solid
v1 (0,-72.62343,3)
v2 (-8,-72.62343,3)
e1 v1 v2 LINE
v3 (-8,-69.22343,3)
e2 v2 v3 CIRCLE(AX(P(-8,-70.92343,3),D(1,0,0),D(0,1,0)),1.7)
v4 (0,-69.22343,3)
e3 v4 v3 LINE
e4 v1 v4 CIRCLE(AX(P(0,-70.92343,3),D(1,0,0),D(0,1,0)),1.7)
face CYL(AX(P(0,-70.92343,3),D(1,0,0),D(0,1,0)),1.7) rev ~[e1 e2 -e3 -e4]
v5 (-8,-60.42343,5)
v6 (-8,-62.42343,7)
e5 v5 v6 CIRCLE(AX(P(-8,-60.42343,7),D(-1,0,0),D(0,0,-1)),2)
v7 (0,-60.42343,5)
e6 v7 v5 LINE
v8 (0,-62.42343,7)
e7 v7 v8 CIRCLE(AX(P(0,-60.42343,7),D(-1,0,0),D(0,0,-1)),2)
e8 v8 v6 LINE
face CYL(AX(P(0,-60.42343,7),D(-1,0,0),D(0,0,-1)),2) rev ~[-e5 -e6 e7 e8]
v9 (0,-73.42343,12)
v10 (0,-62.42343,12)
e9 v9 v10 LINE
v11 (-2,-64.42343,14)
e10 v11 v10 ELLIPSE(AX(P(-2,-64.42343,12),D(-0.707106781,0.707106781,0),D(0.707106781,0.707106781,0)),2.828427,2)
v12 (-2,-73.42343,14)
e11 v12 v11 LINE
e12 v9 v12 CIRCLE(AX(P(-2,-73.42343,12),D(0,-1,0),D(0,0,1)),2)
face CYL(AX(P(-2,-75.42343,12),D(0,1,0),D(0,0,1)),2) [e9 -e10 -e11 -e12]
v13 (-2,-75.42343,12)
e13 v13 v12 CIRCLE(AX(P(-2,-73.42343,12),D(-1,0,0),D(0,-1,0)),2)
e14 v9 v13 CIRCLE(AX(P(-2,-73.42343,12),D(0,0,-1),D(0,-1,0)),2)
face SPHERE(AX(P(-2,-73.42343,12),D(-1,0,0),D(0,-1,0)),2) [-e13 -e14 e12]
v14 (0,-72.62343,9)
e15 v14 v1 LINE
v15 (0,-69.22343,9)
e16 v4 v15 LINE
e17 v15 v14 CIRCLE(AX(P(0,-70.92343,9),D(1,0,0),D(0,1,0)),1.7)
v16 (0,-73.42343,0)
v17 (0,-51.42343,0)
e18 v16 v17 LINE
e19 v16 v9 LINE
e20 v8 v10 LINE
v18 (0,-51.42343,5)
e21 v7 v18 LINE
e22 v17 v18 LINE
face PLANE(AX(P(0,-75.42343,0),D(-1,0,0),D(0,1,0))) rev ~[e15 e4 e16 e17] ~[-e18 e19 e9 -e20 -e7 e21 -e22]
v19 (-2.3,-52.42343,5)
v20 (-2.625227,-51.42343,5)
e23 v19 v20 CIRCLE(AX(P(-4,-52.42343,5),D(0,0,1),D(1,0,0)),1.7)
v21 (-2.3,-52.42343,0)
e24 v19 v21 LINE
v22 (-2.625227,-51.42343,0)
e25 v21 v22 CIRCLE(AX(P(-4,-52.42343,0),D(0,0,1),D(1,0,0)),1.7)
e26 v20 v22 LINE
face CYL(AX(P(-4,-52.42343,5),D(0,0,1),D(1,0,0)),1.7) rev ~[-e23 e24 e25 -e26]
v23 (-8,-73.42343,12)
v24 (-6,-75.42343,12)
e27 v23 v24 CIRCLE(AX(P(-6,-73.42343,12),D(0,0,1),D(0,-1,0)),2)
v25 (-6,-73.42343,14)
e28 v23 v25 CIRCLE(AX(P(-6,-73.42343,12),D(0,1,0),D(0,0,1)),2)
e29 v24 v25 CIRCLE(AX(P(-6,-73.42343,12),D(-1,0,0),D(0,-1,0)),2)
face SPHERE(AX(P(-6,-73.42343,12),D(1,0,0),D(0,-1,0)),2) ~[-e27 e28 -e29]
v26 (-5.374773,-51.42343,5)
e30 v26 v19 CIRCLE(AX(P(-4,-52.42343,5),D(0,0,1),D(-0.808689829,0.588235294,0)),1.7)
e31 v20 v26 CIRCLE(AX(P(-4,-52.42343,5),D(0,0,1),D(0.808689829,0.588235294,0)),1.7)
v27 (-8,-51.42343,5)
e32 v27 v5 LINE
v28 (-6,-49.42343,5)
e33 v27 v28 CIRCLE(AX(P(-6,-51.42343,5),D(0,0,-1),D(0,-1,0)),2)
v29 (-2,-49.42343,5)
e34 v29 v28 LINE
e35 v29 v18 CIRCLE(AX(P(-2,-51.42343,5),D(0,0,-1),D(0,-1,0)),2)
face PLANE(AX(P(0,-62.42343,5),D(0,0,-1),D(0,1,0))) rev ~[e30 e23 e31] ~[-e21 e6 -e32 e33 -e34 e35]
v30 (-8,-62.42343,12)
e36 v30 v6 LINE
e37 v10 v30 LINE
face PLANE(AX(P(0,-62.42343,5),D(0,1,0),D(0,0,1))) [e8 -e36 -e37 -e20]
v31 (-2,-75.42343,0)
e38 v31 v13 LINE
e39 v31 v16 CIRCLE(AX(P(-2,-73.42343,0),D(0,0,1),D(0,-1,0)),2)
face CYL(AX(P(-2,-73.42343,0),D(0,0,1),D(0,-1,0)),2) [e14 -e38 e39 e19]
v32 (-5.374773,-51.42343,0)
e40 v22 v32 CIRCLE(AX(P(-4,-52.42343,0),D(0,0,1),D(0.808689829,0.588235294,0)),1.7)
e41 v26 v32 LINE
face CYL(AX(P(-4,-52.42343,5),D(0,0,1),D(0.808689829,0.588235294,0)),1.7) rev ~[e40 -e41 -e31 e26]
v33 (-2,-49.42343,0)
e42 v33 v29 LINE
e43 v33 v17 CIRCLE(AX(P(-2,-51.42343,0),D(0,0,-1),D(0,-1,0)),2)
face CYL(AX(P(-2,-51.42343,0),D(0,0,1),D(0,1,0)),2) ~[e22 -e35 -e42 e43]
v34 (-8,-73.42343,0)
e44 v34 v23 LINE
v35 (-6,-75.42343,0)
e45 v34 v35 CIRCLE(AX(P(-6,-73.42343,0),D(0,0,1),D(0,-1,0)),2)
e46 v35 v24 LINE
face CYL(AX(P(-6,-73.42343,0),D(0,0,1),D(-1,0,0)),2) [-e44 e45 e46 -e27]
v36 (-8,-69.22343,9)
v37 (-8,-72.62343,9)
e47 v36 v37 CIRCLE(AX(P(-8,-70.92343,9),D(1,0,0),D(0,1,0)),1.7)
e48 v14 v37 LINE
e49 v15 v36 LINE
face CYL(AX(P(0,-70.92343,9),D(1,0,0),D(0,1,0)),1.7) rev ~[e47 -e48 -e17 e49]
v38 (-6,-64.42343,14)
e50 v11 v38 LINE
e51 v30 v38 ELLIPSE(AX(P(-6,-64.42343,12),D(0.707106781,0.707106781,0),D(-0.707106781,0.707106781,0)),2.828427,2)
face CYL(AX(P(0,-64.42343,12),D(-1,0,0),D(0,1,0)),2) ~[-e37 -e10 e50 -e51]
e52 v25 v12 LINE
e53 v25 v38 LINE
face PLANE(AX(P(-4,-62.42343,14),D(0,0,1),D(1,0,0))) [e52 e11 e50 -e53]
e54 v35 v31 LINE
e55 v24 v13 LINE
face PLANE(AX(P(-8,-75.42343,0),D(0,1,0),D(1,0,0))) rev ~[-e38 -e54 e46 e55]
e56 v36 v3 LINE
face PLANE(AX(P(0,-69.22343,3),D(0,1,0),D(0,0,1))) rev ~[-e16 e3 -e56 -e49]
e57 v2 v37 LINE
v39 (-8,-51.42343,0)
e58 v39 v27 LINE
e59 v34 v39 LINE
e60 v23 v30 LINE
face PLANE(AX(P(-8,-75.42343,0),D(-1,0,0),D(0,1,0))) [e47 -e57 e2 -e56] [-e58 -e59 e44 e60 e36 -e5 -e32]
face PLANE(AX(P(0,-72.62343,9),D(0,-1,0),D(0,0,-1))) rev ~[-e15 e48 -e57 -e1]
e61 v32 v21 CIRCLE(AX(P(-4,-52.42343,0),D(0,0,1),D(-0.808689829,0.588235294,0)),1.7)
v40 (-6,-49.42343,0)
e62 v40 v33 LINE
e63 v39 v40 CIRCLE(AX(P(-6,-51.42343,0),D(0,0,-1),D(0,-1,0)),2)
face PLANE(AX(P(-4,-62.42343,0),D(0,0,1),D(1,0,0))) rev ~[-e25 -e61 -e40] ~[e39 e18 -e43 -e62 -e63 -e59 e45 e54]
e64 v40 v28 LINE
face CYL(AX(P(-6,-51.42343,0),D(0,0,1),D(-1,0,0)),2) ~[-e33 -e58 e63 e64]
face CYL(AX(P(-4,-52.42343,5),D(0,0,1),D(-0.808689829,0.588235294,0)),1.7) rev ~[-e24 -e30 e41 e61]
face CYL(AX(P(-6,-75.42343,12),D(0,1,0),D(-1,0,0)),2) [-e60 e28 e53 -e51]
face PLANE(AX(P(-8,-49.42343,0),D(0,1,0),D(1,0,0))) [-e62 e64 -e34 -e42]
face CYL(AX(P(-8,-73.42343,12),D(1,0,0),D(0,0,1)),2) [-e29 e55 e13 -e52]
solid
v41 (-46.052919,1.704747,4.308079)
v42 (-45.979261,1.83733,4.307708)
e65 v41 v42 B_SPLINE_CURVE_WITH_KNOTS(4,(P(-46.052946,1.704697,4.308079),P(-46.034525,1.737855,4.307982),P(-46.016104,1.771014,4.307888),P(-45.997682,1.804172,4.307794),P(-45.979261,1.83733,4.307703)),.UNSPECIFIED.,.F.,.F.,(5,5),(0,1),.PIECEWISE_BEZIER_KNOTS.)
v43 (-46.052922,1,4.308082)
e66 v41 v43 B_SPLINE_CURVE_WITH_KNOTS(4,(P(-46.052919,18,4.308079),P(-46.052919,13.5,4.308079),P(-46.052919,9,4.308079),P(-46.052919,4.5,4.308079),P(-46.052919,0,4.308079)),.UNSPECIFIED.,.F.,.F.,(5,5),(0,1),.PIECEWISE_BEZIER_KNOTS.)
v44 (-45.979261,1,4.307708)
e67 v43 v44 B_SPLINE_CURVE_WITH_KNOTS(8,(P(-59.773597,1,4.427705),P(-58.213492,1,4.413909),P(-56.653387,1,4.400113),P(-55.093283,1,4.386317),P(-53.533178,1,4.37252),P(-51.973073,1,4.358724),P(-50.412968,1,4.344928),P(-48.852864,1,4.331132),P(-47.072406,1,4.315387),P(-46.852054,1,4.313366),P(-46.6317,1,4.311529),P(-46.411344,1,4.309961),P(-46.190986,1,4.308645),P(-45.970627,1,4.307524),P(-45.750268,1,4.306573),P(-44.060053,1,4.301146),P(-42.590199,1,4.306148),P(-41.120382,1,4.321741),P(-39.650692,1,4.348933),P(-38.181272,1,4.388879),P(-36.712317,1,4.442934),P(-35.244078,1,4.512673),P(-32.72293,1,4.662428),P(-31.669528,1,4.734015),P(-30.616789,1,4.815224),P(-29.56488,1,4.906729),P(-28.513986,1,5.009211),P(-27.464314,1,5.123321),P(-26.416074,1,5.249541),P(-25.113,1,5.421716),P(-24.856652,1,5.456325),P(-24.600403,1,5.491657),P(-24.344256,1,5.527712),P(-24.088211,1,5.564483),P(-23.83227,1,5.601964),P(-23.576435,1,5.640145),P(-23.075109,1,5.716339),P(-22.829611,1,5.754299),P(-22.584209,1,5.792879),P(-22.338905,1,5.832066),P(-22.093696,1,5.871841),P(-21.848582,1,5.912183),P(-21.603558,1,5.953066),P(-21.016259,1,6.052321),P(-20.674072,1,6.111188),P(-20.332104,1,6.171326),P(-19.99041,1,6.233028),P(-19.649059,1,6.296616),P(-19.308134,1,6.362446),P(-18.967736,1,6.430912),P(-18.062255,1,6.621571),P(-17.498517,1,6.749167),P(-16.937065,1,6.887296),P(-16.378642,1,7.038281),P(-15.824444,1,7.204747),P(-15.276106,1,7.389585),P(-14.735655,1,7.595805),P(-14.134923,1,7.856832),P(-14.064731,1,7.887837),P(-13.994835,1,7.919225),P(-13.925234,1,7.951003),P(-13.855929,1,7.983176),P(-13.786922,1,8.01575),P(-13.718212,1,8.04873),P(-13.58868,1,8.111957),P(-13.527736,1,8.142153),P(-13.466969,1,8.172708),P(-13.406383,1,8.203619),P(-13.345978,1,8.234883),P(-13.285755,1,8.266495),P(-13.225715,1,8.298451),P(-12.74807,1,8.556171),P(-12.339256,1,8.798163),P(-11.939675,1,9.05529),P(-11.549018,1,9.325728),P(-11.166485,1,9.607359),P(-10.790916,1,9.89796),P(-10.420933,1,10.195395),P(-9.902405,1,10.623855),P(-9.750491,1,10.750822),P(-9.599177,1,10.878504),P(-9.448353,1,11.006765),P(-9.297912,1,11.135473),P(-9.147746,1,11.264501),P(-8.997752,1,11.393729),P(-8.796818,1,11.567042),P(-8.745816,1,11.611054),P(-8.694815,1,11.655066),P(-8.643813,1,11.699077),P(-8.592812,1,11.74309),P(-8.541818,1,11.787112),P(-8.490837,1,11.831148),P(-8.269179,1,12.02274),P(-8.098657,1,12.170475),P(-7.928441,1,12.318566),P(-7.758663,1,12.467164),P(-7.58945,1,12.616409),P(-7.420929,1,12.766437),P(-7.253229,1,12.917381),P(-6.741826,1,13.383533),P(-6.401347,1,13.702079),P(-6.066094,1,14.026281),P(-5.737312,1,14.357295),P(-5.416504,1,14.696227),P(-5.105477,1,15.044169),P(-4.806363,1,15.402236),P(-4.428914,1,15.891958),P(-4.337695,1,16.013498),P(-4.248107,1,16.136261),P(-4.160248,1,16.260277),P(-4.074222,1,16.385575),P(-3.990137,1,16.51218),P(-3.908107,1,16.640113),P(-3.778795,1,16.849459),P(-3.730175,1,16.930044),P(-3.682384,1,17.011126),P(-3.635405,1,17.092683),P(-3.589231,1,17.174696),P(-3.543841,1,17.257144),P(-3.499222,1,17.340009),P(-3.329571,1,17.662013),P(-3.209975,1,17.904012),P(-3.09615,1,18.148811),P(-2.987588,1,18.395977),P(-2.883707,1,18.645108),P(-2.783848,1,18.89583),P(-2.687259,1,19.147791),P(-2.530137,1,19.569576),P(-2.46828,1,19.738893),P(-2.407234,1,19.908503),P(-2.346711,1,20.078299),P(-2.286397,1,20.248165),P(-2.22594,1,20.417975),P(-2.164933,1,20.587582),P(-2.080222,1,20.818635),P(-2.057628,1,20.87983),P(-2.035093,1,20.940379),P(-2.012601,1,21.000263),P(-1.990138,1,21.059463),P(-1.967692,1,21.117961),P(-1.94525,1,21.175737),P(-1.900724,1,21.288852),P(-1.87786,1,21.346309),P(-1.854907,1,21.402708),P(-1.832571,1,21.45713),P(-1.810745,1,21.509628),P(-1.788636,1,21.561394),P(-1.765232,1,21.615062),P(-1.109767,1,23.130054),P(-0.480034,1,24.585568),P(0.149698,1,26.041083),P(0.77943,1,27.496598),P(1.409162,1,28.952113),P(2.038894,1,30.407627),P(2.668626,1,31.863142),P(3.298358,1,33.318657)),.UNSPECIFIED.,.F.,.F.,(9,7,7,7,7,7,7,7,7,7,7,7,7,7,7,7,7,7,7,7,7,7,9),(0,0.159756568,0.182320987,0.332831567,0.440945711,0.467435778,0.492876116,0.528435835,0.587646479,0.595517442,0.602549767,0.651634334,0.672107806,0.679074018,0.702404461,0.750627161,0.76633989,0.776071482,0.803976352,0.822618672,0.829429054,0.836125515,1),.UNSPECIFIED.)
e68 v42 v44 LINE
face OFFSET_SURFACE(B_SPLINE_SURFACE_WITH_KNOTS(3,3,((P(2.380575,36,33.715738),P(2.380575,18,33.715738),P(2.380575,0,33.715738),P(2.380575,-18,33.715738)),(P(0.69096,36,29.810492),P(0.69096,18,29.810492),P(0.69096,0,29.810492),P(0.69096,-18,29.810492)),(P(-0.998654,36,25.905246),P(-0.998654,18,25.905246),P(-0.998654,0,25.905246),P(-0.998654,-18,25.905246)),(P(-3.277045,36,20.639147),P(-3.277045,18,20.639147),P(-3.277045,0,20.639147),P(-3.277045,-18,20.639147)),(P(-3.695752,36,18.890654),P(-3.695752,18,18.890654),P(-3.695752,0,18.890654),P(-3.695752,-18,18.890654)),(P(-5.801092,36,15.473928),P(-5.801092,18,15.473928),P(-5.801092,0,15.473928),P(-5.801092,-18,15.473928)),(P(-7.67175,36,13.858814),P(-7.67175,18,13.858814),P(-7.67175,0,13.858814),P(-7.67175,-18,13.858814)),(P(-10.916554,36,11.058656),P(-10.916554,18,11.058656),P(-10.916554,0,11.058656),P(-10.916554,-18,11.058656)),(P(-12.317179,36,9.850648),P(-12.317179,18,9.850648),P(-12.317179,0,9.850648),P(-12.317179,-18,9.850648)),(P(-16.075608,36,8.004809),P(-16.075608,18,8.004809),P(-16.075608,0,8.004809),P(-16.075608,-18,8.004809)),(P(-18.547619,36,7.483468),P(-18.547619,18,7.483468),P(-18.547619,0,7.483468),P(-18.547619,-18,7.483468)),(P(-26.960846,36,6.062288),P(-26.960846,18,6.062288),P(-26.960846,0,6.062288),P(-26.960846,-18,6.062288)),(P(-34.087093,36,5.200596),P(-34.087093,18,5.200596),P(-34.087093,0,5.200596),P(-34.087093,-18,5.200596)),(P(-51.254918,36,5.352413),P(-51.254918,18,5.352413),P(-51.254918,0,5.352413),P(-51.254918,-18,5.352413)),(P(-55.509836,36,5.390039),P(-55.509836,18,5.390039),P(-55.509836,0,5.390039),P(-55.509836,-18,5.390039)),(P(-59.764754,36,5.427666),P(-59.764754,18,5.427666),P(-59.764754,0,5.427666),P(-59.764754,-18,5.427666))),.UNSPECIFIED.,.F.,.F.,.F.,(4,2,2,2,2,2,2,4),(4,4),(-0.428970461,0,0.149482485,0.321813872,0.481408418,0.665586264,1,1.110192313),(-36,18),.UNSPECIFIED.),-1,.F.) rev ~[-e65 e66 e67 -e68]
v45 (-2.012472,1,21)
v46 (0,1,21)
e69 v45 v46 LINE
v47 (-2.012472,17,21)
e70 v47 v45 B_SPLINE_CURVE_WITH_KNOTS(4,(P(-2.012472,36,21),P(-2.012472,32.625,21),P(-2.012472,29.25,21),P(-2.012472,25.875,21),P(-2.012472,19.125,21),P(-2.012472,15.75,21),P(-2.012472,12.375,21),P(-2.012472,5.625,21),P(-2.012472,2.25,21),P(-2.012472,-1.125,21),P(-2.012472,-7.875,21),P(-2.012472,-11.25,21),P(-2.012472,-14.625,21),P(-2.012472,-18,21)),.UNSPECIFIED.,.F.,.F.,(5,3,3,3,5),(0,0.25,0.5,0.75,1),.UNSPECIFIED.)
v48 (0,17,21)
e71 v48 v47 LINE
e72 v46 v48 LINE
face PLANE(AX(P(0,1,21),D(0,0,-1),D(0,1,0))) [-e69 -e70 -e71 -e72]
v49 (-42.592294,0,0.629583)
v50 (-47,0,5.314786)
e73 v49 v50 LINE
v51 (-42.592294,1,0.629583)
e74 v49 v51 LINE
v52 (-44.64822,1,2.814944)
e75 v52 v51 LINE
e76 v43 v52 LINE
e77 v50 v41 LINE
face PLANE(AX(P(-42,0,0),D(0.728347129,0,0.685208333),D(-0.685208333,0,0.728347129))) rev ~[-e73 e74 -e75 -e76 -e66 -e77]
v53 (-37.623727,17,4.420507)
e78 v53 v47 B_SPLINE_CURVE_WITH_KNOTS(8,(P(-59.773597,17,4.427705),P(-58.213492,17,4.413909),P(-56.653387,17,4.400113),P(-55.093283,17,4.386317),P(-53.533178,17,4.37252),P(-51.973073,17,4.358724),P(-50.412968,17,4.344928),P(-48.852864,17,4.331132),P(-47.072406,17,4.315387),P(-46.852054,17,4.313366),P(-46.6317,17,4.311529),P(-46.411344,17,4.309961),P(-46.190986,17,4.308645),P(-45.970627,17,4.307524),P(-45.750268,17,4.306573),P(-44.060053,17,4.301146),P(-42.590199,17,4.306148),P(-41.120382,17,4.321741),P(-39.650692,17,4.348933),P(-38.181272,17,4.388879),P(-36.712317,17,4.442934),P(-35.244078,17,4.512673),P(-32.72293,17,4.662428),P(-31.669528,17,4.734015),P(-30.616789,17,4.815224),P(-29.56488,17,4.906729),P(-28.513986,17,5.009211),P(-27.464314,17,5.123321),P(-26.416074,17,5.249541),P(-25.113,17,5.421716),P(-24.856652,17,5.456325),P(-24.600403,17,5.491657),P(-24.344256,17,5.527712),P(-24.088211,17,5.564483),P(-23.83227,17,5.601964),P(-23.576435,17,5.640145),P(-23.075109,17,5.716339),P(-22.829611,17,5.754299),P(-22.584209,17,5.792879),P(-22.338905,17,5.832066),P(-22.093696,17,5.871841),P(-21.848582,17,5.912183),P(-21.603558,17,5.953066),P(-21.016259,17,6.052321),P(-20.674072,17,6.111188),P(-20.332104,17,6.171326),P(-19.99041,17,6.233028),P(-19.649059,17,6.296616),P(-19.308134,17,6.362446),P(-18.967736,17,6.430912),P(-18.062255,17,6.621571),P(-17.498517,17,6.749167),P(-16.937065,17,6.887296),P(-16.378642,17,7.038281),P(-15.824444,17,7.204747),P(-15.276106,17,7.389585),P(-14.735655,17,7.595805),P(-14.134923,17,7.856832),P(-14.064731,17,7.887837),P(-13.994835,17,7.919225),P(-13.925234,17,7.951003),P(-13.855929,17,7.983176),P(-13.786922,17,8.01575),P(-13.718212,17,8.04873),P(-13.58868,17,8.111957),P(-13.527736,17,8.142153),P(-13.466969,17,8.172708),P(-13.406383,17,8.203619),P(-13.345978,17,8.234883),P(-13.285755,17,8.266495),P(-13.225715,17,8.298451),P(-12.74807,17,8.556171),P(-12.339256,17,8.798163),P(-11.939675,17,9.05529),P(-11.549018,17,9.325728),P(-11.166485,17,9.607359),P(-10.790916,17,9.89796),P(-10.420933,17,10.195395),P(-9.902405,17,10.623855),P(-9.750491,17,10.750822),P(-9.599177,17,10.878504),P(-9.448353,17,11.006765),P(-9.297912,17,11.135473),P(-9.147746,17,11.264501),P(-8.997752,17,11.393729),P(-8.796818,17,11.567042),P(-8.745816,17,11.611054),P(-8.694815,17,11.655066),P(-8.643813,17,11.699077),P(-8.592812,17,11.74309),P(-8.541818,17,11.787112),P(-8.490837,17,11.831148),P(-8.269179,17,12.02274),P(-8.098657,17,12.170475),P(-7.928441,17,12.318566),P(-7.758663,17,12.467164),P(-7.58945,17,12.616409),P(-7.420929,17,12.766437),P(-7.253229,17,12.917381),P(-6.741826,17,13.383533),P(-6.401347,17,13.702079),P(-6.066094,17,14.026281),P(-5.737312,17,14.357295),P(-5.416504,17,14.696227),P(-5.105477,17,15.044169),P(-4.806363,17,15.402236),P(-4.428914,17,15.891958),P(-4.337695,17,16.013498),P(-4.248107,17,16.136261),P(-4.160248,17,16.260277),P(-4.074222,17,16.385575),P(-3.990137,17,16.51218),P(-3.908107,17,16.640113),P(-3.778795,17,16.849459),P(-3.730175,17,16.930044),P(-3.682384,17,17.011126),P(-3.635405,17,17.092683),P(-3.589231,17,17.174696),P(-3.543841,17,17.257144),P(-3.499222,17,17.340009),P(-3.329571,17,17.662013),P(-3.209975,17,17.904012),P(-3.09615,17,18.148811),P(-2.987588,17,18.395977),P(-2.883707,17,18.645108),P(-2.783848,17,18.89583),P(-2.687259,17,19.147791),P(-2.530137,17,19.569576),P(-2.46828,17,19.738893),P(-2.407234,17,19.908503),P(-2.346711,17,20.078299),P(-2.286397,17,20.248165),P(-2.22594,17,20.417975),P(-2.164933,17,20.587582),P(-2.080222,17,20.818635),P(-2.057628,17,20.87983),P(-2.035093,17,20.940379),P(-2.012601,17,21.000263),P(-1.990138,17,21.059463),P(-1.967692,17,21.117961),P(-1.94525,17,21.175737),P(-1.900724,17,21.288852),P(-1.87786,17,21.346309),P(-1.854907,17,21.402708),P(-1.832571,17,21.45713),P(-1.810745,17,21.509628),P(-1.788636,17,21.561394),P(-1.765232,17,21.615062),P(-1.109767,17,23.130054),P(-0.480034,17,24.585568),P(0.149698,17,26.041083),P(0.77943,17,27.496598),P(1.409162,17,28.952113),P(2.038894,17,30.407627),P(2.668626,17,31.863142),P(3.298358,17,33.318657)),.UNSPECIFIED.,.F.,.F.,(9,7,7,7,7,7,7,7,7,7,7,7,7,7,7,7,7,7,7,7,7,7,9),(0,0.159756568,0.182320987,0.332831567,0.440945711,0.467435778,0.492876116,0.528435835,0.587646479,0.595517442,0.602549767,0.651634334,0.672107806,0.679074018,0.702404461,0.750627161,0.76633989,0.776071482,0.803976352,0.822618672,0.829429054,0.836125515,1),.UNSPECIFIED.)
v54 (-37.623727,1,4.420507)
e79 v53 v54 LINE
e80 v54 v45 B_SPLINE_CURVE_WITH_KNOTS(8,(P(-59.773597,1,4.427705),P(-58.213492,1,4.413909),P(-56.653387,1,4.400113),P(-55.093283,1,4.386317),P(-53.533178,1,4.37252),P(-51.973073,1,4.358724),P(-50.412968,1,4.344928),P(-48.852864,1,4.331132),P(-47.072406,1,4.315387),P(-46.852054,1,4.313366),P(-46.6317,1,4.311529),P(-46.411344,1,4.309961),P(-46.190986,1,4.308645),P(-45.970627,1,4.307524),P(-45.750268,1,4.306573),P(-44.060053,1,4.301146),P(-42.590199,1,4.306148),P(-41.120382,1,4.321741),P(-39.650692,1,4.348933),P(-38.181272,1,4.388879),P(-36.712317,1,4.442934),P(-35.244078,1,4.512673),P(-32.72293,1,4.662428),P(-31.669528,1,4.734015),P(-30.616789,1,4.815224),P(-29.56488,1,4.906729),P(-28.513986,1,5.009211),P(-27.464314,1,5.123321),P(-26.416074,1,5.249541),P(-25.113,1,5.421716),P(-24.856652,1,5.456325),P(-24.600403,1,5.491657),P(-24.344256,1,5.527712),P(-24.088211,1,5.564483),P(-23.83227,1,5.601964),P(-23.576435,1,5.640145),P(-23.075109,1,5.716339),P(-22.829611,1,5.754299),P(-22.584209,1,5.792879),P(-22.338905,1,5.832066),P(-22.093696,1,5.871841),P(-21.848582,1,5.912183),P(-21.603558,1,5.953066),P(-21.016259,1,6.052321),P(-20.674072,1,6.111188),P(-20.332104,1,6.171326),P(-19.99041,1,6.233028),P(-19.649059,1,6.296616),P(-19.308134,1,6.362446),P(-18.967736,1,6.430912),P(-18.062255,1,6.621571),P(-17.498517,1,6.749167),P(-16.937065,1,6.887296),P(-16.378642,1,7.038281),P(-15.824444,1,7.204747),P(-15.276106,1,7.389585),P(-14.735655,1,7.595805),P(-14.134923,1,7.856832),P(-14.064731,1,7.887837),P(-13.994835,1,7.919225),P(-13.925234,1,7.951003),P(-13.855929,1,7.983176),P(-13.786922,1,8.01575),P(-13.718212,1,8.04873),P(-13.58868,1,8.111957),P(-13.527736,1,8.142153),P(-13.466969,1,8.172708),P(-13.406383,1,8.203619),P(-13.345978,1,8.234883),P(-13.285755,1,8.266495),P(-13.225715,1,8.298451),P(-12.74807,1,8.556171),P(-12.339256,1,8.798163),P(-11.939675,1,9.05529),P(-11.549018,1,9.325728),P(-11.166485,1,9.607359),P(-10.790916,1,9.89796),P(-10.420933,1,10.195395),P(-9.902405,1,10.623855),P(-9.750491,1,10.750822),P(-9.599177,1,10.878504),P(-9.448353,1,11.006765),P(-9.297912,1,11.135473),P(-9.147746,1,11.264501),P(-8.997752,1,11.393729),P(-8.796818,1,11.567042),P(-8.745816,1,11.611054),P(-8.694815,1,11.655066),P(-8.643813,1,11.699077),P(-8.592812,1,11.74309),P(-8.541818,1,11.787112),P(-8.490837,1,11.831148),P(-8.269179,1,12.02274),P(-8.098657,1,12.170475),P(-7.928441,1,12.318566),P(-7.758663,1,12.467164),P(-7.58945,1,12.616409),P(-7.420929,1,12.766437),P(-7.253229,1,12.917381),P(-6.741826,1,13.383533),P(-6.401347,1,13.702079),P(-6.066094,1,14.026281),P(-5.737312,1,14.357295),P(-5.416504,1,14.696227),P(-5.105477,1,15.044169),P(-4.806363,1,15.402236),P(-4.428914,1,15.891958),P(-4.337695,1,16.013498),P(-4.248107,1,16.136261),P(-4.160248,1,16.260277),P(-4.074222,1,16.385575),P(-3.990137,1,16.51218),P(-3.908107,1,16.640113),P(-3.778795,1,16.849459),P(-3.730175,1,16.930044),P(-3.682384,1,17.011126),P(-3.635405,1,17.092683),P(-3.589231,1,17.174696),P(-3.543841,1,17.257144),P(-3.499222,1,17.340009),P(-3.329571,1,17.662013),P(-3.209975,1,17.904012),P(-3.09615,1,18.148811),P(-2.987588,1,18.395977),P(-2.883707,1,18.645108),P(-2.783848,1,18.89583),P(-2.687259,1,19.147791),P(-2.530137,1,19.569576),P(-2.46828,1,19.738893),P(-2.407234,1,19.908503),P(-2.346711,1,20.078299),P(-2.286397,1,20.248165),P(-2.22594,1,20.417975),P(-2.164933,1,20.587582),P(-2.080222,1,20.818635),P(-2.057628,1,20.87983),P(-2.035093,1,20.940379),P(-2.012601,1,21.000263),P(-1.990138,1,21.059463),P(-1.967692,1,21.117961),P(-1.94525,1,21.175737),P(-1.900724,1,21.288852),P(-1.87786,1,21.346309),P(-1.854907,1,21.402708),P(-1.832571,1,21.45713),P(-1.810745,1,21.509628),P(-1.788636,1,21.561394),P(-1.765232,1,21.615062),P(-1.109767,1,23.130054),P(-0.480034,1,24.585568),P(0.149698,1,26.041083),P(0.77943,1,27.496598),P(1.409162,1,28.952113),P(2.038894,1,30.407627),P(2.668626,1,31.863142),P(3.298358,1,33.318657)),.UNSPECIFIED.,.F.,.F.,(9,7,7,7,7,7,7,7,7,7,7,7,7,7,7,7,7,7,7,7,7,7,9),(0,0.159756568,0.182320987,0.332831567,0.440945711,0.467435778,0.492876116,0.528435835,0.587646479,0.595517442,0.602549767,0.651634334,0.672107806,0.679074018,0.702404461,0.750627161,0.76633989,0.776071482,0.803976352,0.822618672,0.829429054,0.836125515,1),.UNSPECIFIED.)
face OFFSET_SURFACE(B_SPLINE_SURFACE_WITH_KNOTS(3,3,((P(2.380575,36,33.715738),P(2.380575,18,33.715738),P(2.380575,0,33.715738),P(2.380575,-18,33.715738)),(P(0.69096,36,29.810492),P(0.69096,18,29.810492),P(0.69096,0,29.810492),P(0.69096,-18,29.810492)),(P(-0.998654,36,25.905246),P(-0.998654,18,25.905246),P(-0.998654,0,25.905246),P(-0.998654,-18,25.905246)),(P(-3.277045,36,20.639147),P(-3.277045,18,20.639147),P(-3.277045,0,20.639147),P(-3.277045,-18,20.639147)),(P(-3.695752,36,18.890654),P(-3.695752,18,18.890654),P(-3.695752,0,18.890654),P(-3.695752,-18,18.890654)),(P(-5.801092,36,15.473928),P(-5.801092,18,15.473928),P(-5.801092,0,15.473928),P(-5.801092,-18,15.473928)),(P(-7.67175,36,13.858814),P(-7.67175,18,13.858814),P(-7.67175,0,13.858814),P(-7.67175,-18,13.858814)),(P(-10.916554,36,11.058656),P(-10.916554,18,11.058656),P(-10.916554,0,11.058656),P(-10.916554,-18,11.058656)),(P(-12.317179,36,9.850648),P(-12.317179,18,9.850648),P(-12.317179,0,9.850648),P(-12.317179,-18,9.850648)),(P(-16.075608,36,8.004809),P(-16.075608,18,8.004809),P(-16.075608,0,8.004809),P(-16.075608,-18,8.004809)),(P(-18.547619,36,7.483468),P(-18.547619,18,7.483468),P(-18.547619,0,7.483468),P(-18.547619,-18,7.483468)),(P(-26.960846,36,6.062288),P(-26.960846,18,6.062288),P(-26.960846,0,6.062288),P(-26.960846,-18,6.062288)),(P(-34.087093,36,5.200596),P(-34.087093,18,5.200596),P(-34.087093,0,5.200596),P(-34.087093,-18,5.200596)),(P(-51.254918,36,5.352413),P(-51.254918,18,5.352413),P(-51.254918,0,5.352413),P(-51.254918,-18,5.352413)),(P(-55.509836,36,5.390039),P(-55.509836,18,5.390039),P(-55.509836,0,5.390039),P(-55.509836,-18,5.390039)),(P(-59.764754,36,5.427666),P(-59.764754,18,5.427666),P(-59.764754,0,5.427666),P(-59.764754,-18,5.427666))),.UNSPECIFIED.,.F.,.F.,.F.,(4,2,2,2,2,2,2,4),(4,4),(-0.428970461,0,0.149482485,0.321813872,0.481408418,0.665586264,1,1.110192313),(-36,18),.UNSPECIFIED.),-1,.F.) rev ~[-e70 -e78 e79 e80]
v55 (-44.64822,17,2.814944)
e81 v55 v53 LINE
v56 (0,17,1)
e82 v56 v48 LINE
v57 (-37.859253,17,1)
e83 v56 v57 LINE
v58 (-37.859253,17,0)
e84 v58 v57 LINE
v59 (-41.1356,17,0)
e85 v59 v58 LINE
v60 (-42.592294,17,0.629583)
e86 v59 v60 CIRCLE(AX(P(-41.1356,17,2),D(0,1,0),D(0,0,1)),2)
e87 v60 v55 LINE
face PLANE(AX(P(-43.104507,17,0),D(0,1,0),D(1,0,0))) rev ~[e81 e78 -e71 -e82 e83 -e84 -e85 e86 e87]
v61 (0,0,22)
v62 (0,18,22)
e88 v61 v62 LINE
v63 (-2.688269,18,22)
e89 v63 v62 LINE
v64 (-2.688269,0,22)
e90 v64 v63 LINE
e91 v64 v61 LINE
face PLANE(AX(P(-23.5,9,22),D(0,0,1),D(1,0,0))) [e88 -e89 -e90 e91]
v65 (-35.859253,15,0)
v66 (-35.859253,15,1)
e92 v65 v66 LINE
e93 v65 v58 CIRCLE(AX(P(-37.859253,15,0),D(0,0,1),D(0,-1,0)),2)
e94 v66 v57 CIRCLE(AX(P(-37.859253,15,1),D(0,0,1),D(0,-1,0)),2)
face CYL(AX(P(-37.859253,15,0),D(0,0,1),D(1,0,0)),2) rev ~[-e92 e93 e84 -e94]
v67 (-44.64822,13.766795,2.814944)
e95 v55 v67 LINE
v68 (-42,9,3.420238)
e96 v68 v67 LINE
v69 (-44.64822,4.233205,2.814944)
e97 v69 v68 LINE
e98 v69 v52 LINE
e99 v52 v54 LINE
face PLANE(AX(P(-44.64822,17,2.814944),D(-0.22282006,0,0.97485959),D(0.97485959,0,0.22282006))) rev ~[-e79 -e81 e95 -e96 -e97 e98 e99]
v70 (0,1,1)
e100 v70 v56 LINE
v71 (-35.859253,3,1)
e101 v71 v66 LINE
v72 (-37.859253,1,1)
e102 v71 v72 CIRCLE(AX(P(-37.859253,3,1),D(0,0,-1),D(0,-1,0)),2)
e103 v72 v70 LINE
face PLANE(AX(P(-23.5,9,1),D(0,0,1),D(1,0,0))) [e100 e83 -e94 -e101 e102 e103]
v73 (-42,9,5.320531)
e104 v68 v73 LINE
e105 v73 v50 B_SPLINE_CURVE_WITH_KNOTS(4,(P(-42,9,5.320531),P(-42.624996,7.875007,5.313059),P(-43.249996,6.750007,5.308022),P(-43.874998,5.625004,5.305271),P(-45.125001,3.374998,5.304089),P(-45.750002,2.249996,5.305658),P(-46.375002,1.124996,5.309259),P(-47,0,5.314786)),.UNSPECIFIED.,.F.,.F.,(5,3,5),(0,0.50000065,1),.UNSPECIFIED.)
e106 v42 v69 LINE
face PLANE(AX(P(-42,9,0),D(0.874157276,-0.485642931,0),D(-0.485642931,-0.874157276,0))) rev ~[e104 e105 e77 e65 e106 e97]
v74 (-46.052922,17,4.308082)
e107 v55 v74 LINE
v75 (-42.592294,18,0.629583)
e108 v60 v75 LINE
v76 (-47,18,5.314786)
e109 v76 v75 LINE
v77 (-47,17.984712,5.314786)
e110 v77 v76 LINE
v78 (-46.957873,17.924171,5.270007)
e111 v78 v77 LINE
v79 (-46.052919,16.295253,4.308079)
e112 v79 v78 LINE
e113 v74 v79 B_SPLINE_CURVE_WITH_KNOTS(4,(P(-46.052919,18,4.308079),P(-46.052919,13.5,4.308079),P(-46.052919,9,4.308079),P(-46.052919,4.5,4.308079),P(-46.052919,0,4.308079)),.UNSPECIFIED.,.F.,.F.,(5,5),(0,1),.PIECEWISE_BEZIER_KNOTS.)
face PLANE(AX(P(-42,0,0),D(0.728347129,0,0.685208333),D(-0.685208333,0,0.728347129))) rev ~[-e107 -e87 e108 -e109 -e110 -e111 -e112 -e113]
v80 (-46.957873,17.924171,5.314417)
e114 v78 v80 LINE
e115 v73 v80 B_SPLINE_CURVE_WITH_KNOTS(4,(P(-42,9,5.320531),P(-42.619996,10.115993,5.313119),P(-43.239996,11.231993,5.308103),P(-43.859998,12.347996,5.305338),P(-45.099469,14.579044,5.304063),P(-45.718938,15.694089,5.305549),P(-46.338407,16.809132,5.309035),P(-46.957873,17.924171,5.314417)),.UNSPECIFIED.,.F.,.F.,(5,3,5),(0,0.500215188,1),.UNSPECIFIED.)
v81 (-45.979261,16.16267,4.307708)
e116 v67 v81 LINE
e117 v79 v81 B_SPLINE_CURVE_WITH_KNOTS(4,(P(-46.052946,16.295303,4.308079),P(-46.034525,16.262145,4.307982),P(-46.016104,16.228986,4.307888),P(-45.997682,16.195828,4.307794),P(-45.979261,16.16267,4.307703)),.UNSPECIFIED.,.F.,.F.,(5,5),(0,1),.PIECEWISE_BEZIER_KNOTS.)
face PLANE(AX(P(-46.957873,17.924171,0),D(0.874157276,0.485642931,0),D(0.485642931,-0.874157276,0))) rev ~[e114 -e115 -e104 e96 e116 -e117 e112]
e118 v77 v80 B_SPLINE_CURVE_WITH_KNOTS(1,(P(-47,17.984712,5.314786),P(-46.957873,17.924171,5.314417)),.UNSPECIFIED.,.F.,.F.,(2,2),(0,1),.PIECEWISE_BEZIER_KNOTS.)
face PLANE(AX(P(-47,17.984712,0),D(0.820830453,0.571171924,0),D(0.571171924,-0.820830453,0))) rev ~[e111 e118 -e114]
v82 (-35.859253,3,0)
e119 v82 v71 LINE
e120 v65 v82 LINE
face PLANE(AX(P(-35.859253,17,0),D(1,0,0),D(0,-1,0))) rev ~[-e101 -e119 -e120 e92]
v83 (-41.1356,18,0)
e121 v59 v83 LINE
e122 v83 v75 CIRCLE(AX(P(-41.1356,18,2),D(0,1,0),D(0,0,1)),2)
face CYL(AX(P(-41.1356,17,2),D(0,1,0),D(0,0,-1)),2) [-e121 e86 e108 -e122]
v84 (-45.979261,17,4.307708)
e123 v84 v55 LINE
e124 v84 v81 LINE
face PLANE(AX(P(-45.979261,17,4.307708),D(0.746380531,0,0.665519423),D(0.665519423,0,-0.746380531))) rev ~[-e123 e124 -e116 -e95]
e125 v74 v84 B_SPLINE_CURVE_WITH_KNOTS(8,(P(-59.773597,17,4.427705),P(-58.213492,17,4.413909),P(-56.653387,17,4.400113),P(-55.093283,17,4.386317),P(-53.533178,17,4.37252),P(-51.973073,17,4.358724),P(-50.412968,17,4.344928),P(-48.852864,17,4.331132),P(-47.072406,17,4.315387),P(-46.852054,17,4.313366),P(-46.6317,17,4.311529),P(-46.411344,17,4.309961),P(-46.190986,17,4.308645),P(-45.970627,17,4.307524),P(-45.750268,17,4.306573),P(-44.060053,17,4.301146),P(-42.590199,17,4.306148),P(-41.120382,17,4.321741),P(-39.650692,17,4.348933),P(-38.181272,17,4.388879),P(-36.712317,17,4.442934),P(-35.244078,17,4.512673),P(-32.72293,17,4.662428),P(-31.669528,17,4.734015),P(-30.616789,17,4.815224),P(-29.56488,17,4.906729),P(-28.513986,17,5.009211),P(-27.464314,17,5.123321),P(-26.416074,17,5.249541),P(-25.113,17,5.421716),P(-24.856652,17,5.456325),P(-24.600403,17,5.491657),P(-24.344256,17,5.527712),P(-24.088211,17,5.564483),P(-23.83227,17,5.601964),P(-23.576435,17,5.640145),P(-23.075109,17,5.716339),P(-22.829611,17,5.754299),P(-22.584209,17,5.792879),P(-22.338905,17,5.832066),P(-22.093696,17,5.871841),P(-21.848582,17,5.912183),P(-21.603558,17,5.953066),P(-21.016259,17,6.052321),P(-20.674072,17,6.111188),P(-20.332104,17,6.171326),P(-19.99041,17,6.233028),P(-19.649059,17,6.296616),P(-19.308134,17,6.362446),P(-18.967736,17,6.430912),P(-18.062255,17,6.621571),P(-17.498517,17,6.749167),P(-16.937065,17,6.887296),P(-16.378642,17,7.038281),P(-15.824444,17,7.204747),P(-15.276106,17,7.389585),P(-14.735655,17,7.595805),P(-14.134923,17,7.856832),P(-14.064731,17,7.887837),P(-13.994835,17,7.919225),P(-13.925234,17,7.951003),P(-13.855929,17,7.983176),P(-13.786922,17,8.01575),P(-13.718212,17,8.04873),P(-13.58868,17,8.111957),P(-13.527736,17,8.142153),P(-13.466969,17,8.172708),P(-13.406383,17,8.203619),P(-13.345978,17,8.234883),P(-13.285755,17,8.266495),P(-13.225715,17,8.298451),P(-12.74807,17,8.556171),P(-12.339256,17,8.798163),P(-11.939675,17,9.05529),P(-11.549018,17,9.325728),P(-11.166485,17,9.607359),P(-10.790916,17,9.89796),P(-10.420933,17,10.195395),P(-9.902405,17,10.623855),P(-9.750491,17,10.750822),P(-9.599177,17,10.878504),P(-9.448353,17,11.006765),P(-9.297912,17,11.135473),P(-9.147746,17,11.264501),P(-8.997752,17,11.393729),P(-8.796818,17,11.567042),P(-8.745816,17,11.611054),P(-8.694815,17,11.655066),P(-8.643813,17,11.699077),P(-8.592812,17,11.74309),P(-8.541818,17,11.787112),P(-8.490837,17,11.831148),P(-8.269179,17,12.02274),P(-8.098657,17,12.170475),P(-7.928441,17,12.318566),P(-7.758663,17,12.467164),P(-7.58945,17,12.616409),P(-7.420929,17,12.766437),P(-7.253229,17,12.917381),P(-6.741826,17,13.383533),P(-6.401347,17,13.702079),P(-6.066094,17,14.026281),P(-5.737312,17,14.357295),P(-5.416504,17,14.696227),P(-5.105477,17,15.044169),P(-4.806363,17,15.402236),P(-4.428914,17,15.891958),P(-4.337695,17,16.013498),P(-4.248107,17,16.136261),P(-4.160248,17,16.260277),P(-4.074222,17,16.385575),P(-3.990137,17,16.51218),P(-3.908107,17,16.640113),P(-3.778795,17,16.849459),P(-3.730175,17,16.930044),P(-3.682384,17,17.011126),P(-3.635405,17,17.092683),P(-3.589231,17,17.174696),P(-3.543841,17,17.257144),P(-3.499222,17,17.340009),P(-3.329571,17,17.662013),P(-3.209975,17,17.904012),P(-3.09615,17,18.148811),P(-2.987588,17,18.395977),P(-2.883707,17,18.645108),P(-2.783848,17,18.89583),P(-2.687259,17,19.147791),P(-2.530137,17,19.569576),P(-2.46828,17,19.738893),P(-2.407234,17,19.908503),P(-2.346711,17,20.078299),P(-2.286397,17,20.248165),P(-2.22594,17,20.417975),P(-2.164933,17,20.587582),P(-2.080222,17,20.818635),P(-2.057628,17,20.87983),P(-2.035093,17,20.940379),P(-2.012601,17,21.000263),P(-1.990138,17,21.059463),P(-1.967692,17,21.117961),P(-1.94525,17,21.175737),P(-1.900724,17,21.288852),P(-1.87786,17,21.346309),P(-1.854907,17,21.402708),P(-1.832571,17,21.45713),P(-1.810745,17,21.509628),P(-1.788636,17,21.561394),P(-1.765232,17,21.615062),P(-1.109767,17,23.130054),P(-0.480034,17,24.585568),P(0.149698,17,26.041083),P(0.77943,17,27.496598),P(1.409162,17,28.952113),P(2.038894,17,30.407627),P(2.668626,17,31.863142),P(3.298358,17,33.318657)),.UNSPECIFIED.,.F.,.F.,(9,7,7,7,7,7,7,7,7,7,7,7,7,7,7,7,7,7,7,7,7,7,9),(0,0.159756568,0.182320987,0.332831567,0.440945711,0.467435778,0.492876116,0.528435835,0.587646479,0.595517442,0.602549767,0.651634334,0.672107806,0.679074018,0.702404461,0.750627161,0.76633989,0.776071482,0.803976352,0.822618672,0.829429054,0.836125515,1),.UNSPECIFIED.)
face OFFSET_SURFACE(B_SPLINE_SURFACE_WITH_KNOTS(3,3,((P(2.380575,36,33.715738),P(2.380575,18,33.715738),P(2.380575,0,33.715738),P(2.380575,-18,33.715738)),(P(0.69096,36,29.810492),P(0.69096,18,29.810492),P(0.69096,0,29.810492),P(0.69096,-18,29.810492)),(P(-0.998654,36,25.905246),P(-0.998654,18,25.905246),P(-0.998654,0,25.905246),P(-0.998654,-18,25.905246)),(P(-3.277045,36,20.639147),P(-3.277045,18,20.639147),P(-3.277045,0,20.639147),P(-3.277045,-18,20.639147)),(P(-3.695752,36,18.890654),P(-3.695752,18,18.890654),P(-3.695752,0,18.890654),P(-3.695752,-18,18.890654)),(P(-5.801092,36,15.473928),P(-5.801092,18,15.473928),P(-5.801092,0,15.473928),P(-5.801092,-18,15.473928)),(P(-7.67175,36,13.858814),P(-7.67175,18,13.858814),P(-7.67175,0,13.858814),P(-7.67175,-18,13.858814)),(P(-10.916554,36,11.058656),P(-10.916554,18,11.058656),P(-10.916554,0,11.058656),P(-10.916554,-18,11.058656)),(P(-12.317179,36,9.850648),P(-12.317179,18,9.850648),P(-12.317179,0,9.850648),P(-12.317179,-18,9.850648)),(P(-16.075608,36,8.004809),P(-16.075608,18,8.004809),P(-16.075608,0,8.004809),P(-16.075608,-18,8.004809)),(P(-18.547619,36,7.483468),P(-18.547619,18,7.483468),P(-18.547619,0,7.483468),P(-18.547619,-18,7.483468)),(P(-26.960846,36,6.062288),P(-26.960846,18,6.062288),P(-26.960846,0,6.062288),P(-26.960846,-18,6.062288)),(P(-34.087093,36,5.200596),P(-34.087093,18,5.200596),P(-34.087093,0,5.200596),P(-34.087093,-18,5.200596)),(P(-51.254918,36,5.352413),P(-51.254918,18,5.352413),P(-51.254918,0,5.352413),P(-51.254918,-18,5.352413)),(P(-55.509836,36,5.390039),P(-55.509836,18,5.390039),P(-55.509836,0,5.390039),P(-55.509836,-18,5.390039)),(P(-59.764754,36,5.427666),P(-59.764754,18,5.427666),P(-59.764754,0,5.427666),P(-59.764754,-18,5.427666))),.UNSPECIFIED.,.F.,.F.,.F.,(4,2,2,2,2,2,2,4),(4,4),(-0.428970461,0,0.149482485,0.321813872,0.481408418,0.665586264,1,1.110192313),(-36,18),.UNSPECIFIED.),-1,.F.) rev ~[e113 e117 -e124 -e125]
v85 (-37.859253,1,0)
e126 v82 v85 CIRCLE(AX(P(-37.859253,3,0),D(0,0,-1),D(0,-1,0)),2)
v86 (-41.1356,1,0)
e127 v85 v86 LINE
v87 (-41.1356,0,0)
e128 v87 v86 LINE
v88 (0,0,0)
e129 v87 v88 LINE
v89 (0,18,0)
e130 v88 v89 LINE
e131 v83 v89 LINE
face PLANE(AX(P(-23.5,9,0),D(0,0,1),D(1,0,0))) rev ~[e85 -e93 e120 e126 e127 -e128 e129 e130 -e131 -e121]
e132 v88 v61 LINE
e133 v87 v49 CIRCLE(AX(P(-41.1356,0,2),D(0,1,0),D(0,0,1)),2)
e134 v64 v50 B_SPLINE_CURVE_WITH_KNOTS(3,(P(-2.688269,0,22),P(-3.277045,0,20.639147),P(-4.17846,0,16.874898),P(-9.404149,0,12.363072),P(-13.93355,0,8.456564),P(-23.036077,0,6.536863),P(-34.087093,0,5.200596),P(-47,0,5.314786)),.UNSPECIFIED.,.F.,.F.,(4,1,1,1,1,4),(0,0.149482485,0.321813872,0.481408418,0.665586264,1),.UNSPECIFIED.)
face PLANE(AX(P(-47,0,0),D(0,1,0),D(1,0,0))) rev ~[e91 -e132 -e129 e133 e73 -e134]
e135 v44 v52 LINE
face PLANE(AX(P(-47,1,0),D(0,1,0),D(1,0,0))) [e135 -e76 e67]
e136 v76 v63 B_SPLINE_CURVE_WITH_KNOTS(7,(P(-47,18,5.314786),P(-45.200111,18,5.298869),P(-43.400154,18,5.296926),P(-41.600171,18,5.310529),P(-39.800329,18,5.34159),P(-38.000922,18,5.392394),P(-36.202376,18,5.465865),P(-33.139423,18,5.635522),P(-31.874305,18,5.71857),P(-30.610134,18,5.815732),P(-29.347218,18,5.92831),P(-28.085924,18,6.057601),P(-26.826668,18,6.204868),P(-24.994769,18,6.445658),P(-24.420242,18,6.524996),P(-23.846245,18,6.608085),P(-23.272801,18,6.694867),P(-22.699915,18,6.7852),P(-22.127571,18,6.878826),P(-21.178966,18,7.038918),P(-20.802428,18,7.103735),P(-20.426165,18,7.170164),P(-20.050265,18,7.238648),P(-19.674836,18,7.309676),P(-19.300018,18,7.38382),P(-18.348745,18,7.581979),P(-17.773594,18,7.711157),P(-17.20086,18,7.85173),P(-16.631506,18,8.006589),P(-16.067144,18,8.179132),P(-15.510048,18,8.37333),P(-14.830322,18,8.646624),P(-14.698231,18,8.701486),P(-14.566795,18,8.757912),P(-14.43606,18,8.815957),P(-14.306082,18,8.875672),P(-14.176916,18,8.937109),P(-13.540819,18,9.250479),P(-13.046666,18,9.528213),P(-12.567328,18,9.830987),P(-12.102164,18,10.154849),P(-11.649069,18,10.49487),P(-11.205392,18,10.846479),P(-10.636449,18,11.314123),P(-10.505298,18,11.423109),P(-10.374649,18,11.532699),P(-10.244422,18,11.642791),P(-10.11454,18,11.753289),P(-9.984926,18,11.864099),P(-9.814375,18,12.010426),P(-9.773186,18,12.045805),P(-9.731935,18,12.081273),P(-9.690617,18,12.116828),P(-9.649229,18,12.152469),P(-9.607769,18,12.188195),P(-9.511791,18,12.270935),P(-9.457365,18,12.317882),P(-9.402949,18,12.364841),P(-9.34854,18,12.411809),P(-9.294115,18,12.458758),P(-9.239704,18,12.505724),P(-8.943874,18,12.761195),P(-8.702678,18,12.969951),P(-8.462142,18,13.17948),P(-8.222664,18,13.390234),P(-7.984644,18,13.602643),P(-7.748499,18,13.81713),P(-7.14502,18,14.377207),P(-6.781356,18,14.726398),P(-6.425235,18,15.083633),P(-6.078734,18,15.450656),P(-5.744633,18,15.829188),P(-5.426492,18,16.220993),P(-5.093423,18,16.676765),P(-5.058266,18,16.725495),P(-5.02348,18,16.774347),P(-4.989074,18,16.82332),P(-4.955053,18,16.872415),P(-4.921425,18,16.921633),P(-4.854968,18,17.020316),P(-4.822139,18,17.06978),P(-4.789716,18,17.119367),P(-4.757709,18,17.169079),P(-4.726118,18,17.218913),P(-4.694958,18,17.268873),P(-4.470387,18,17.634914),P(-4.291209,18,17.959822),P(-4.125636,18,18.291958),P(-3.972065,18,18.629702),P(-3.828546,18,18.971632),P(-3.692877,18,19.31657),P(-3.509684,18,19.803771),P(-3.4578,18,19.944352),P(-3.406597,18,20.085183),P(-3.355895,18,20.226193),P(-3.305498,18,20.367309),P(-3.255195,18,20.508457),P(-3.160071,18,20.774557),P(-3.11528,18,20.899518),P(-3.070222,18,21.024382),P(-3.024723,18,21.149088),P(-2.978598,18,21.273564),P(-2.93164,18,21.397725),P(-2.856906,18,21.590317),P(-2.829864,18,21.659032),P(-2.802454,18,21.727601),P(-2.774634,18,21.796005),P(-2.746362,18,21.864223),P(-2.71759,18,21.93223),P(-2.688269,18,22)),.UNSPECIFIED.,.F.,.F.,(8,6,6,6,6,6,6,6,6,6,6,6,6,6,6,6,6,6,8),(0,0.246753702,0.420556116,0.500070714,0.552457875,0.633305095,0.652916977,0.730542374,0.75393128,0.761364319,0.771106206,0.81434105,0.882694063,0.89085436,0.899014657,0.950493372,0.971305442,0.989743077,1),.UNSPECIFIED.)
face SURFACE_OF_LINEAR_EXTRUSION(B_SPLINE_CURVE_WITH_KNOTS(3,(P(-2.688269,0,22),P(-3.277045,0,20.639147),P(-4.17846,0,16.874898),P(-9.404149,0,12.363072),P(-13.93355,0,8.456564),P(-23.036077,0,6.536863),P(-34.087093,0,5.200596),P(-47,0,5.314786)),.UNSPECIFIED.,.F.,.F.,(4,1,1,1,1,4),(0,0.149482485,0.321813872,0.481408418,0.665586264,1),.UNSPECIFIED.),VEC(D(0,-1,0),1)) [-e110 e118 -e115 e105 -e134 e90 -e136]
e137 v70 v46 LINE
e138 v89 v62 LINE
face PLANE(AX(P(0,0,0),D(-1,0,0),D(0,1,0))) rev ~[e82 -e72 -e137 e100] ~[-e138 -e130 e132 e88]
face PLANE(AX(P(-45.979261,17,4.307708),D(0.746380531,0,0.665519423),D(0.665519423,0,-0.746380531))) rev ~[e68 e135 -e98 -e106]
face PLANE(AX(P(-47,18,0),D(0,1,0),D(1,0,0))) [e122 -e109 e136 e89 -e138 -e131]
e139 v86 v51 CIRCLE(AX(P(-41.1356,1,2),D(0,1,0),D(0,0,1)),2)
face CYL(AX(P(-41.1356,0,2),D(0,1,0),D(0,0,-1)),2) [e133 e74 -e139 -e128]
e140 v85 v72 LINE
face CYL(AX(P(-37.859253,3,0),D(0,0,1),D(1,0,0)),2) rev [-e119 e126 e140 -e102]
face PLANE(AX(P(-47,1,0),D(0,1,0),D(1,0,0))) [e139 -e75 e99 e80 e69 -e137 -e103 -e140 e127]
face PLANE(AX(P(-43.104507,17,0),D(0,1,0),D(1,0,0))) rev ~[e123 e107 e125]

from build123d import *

# Parameters (mm, degrees)
F0_W      = 47
F0_H      = 18
F1_DEPTH  = 22
F4_DEPTH  = 25
F5_DEPTH  = 25
F7_T      = -1
F2_W      = 16
F2_H      = 20
F8_DEPTH  = 1
F9_W      = 8
F9_H      = 26
F10_DEPTH = 14
F11_W     = 13
F11_H     = 9
F12_DEPTH = 25
F13_R     = 2
F15_DEPTH = 25
F17_DEPTH = 25
F19_W     = 6.1407467425
F19_H     = 16
F20_DEPTH = 2
F21_R     = 2
F23_DEPTH = 16
F24_DEPTH = 25


# Not quite as in the source:
# - ends of sketch curves that miss each other by under 0.0002 mm in the source are joined


with BuildPart() as f1:
    # F0 (on Top) → F1 (new body)
    with BuildSketch(Plane.XY):
        with Locations((-23.5, 9)):
            Rectangle(F0_W, F0_H)
    extrude(amount=F1_DEPTH)

    # F3 (on face) → F4 (cut)
    with BuildSketch(Plane.XZ):
        with BuildLine():
            add(Edge.make_bspline(
                [(-2.6882688196, 22), (-3.2770454434, 20.6391466758), (-4.1784598757, 16.8748983141), (-9.4041486141, 12.3630724805), (-13.9335501605, 8.4565637973), (-23.0360767099, 6.5368633633), (-34.0870933489, 5.200595818), (-47, 5.3147859871)],
                knots=[0, 0, 0, 0, 0.1494824851, 0.3218138719, 0.4814084184, 0.6655862643, 1, 1, 1, 1], degree=3))
            Line((-2.6882688196, 22), (-47, 22))
            Line((-47, 22), (-47, 5.3147859871))
        make_face()
    extrude(amount=-F4_DEPTH, mode=Mode.SUBTRACT)

    # F3 (on face) → F5 (cut)
    with BuildSketch(Plane.XZ):
        Polygon((-42, 0), (-47, 5.3147859871), (-47, 0), align=None)
    extrude(amount=-F5_DEPTH, mode=Mode.SUBTRACT)

    # F7
    f7_openings = [f1.faces().sort_by_distance(p)[0] for p in [
        (-44.5, 9, 2.657393),
    ]]
    offset(amount=F7_T, openings=f7_openings, kind=Kind.INTERSECTION)

    # F2 (on face) → F8 (cut)
    with BuildSketch(Plane.YZ):
        with Locations((9, 11)):
            Rectangle(F2_W, F2_H)
    extrude(amount=-F8_DEPTH, mode=Mode.SUBTRACT)

    # F19 (on face) → F20 (cut)
    with BuildSketch(Plane(origin=(0, 0, 0), x_dir=(1, 0, 0), z_dir=(0, 0, -1))):
        with Locations((-38.9296266288, -9)):
            Rectangle(F19_W, F19_H)
        Polygon((-42, -1), (-42.6852083329, -1), (-43.1045070291, -1), (-43.1045070291, -17), (-42.6852083329, -17), (-42, -17), align=None)
    extrude(amount=-F20_DEPTH, mode=Mode.SUBTRACT)

    # F21
    f21_edges = [f1.edges().sort_by_distance(p)[0] for p in [
        (-35.859253, 17, 0.5),
        (-35.859253, 1, 0.5),
        (-42, 0.5, 0),
        (-42, 17.5, 0),
    ]]
    fillet(f21_edges, radius=F21_R)

    # F22 (on face) → F23 (join, through all)
    with BuildSketch(Plane.XZ.offset(-17)):
        with BuildLine():
            add(Edge.make_bspline(
                [(-45.979261035, 4.3077080456), (-45.9230921355, 4.3074304854), (-45.8669231813, 4.3071662313), (-45.8107541815, 4.3069151492), (-45.7545851445, 4.306677229), (-45.6984160781, 4.3064526573), (-45.6422469881, 4.3062418902), (-45.5860778784, 4.3060457258), (-44.541461727, 4.3026916555), (-43.5530151209, 4.3039144034), (-42.564580075, 4.309797802), (-41.5761785653, 4.3206346602), (-40.5878433409, 4.3367473036), (-39.599618044, 4.3584926715), (-38.61155733, 4.3862671393), (-37.6237268056, 4.4205065789)],
                knots=[0.1765693684, 0.1765693684, 0.1765693684, 0.1765693684, 0.1765693684, 0.1765693684, 0.1765693684, 0.1765693684, 0.1765693684, 0.1823209871, 0.1823209871, 0.1823209871, 0.1823209871, 0.1823209871, 0.1823209871, 0.1823209871, 0.2835362009, 0.2835362009, 0.2835362009, 0.2835362009, 0.2835362009, 0.2835362009, 0.2835362009, 0.2835362009, 0.2835362009], degree=8))
            Line((-45.979261035, 4.3077080456), (-44.6482196738, 2.8149441627))
            Line((-44.6482196738, 2.8149441627), (-37.6237268056, 4.4205065789))
        make_face()
    extrude(amount=F23_DEPTH)

    # F18 (on face) → F24 (cut)
    with BuildSketch(Plane(origin=(0, 0, 0), x_dir=(1, 0, 0), z_dir=(0, 0, -1))):
        Polygon((-47, -17.9847120319), (-46.9578729263, -17.9241712673), (-42, -9), (-47, 0), align=None)
    extrude(amount=-F24_DEPTH, mode=Mode.SUBTRACT)


with BuildPart() as f10:
    # F9 (on Top) → F10 (new body)
    with BuildSketch(Plane.XY):
        with Locations((-4, -62.4234300312)):
            Rectangle(F9_W, F9_H)
    extrude(amount=F10_DEPTH)

    # F11 (on face) → F12 (cut)
    with BuildSketch(Plane.YZ):
        with Locations((-55.9234300312, 9.5)):
            Rectangle(F11_W, F11_H)
    extrude(amount=-F12_DEPTH, mode=Mode.SUBTRACT)

    # F13
    f13_edges = [f10.edges().sort_by_distance(p)[0] for p in [
        (-4, -75.42343, 14),
        (-8, -75.42343, 7),
        (0, -75.42343, 7),
        (0, -68.92343, 14),
        (-8, -68.92343, 14),
        (-4, -62.42343, 5),
        (0, -49.42343, 2.5),
        (-8, -49.42343, 2.5),
        (-4, -62.42343, 14),
    ]]
    fillet(f13_edges, radius=F13_R)

    # F14 (on face) → F15 (cut)
    with BuildSketch(Plane.YZ):
        with BuildLine():
            ThreePointArc((-72.6234300312, 3), (-70.9234300312, 4.7), (-69.2234300312, 3))
            Line((-69.2234300312, 3), (-69.2234300312, 9))
            ThreePointArc((-69.2234300312, 9), (-70.9234300312, 7.3), (-72.6234300312, 9))
            Line((-72.6234300312, 9), (-72.6234300312, 3))
        make_face()
        with BuildLine():
            ThreePointArc((-72.6234300312, 9), (-70.9234300312, 7.3), (-69.2234300312, 9))
            ThreePointArc((-69.2234300312, 9), (-70.9234300312, 10.7), (-72.6234300312, 9))
        make_face()
        with BuildLine():
            ThreePointArc((-72.6234300312, 3), (-70.9234300312, 1.3), (-69.2234300312, 3))
            ThreePointArc((-69.2234300312, 3), (-70.9234300312, 4.7), (-72.6234300312, 3))
        make_face()
    extrude(amount=-F15_DEPTH, mode=Mode.SUBTRACT)

    # F16 (on face) → F17 (cut)
    with BuildSketch(Plane.XY.offset(5)):
        with BuildLine():
            Line((-2.6252272915, -51.4234300312), (-5.3747727085, -51.4234300312))
            ThreePointArc((-5.3747727085, -51.4234300312), (-4.5257786585, -54.0400799012), (-2.3, -52.4234300312))
            ThreePointArc((-2.3, -52.4234300312), (-2.38335013, -51.8976513726), (-2.6252272915, -51.4234300312))
        make_face()
        with BuildLine():
            ThreePointArc((-2.6252272915, -51.4234300312), (-4, -50.7234300312), (-5.3747727085, -51.4234300312))
            Line((-5.3747727085, -51.4234300312), (-2.6252272915, -51.4234300312))
        make_face()
    extrude(amount=-F17_DEPTH, mode=Mode.SUBTRACT)


solid = Compound([f1.part, f10.part])
